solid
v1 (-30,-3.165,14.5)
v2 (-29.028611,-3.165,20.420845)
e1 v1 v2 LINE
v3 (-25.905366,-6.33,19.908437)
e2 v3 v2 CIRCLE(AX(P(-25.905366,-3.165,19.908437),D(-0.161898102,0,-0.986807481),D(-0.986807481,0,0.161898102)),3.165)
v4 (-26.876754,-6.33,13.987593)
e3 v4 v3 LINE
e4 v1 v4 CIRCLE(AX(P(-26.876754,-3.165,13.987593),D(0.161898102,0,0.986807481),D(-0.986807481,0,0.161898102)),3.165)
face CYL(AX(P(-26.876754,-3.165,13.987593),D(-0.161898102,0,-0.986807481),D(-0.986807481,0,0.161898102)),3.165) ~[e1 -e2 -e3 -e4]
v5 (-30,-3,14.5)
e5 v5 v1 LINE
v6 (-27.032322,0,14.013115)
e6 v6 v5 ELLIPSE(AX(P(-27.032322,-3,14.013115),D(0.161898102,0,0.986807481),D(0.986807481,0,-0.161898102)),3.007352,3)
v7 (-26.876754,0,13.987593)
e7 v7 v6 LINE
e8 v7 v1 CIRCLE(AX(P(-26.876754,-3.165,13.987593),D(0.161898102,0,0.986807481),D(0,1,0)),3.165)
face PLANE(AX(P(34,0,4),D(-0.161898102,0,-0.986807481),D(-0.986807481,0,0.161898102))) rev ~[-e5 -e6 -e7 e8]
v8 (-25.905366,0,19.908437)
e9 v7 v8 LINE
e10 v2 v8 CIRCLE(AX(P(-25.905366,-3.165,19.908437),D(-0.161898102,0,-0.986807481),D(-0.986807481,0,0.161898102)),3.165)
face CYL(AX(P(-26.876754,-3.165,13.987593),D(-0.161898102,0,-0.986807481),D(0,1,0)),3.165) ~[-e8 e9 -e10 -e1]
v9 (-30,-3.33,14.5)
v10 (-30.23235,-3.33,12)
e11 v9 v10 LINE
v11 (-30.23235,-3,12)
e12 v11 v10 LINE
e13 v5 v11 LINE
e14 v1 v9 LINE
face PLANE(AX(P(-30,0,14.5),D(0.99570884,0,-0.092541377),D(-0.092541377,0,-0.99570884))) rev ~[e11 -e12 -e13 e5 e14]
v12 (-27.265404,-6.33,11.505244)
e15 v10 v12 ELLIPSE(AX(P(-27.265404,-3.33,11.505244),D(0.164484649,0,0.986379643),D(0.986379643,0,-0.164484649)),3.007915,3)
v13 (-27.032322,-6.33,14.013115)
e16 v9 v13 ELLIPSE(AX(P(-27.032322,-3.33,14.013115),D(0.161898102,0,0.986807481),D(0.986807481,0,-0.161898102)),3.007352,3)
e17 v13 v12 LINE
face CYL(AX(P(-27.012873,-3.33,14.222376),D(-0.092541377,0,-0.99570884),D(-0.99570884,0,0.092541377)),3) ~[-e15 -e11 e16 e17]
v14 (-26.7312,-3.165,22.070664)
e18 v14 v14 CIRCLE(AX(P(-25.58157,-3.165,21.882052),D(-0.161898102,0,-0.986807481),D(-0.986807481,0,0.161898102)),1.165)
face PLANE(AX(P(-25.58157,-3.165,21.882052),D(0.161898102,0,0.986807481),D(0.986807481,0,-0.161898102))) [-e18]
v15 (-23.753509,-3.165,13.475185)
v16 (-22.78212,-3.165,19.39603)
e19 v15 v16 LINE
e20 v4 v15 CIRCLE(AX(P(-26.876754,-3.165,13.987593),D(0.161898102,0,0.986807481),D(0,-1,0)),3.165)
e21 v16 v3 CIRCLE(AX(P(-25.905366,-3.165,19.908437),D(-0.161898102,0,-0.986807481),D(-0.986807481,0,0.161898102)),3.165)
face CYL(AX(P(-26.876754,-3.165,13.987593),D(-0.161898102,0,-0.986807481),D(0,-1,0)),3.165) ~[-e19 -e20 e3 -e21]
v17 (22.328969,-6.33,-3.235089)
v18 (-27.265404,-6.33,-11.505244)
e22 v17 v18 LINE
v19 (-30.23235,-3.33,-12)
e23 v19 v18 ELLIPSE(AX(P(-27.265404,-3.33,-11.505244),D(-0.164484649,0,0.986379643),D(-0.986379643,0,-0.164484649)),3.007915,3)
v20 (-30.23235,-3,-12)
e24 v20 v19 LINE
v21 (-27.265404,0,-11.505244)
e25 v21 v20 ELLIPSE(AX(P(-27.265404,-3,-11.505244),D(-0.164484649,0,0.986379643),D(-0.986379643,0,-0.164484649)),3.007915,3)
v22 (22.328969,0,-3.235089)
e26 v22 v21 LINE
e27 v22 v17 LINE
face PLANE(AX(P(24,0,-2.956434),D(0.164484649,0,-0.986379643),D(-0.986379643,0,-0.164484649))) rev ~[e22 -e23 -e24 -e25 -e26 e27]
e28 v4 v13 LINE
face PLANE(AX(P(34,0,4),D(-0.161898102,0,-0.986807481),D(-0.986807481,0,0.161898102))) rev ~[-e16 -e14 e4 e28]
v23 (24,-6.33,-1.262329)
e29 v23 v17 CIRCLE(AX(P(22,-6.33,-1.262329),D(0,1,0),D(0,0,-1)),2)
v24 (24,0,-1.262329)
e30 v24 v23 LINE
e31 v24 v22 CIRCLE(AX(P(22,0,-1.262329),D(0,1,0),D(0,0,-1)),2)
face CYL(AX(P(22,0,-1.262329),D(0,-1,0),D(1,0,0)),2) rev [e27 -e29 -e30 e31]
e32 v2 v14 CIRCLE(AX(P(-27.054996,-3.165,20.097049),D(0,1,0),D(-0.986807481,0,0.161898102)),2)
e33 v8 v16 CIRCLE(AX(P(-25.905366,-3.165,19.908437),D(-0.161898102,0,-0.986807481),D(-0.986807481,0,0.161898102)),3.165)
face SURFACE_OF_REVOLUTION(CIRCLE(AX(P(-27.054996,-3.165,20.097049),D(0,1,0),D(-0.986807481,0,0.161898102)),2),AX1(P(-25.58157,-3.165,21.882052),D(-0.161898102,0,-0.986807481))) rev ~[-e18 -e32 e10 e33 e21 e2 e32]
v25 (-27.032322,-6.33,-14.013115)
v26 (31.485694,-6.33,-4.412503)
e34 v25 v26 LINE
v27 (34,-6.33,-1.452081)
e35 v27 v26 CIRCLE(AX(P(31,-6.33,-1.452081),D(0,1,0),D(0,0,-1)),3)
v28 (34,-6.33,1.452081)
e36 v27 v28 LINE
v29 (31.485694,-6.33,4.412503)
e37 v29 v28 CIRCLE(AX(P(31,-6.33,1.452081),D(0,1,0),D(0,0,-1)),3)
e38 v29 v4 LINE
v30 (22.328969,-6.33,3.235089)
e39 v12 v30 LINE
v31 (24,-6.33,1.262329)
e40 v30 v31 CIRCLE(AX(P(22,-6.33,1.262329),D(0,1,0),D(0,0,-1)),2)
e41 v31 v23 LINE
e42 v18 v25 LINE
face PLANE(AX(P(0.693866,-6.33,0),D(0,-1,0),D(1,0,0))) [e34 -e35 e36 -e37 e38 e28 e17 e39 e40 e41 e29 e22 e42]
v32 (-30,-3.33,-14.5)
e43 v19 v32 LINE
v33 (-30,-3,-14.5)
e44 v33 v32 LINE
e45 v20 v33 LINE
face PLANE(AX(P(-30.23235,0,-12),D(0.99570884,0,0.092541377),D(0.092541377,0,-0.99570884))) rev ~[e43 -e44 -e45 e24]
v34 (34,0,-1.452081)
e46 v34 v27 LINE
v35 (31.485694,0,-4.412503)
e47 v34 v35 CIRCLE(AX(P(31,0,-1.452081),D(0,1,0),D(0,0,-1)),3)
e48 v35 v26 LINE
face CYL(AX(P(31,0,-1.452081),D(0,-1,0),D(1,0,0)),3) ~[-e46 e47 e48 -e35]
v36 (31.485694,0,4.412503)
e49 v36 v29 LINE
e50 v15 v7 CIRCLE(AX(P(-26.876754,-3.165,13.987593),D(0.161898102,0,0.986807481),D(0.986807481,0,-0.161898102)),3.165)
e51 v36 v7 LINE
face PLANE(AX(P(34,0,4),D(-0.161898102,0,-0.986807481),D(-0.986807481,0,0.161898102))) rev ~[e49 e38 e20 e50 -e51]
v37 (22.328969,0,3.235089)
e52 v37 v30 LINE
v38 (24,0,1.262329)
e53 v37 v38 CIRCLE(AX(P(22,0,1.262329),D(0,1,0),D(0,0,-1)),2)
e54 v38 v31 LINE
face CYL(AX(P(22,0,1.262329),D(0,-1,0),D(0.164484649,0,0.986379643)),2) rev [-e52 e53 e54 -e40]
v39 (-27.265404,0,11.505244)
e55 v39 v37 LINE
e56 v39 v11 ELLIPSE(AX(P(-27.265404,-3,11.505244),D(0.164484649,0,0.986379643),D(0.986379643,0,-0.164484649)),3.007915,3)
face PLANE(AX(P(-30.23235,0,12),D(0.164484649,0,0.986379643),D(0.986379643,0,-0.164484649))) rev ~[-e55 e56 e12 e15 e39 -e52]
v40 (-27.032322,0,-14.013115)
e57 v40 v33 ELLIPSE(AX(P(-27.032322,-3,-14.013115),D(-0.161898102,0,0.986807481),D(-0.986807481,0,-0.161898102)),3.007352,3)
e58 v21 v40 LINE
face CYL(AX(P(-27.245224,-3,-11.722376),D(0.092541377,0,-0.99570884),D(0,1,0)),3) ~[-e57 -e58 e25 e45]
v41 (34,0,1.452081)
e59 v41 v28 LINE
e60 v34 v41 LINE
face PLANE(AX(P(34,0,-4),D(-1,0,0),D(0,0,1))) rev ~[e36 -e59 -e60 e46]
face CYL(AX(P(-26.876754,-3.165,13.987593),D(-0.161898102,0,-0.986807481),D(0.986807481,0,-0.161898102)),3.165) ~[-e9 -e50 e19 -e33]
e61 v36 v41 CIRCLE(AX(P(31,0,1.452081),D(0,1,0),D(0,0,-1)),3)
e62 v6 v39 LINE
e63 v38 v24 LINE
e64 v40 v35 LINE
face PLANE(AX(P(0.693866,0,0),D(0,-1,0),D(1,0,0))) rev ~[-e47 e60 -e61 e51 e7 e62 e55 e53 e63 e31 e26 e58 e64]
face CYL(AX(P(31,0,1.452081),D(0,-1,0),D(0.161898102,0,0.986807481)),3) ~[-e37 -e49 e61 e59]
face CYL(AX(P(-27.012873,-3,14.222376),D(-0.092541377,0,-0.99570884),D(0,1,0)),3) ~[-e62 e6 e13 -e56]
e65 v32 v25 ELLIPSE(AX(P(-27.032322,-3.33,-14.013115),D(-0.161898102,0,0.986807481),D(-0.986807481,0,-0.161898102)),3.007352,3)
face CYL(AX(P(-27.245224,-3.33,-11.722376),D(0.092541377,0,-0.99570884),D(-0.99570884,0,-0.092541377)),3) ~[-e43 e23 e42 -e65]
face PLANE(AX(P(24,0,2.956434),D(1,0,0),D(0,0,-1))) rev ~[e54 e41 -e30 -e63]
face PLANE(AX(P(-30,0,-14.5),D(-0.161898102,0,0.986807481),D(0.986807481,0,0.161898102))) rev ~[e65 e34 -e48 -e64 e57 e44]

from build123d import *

# Parameters (mm, degrees)
F1_DEPTH = 6.33
F2_R     = 2
F3_R     = 3
F5_DEPTH = 8
F7_R     = 3


# Not quite as in the source:
# - a fillet or chamfer that OpenCascade refuses, or shapes differently, is made with other operations: its cross-section is extruded or revolved along the edge and cut away or added


with BuildPart() as f1:
    # F0 (on Front) → F1 (new body)
    with BuildSketch(Plane.XZ):
        Polygon((34, 4), (-30, 14.5), (-30.2323504967, 12), (24, 2.9564342819), (24, -2.9564342819), (-30.2323504967, -12), (-30, -14.5), (34, -4), align=None)
    extrude(amount=F1_DEPTH)

    # F2
    f2_edges = [f1.edges().sort_by_distance(p)[0] for p in [
        (24, -3.165, -2.956434),
        (24, -3.165, 2.956434),
    ]]
    fillet(f2_edges, radius=F2_R)

    # F3
    f3_edges = [f1.edges().sort_by_distance(p)[0] for p in [
        (34, -3.165, 4),
        (34, -3.165, -4),
    ]]
    fillet(f3_edges, radius=F3_R)

    # F4 (on face) → F5 (join)
    with BuildSketch(Plane(origin=(1.5302228826, 0, 9.3270728083), x_dir=(0.9868074809, 0, -0.1618981023), z_dir=(0.1618981023, 0, 0.9868074809))):
        with BuildLine():
            ThreePointArc((-28.7867469125, -6.33), (-26.54875395, -5.4029929625), (-25.6217469125, -3.165))
            ThreePointArc((-25.6217469125, -3.165), (-26.54875395, -0.9270070375), (-28.7867469125, 0))
            ThreePointArc((-28.7867469125, 0), (-31.0247398749, -0.9270070375), (-31.9517469125, -3.165))
            ThreePointArc((-31.9517469125, -3.165), (-31.0247398749, -5.4029929625), (-28.7867469125, -6.33))
        make_face()
    extrude(amount=F5_DEPTH)

    # F6: fillet of radius 2 on 1 edges, made by hand

    # F6_s1 → F6_t2 (revolve, cut)
    with BuildSketch(Plane.XZ.offset(3.165)):
        with BuildLine():
            ThreePointArc((-29.0286113859, 20.4208448857), (-28.221594455, 21.7215636961), (-26.7312002194, 22.0706636429))
            Line((-26.7312002194, 22.0706636429), (-28.7048151813, 22.3944598476))
            Line((-28.7048151813, 22.3944598476), (-29.0286113859, 20.4208448857))
        make_face()
    revolve(axis=Axis((-25.581569504, -3.165, 21.8820523537), (-0.1618981023, 0, -0.9868074809)), mode=Mode.SUBTRACT)

    # F7
    f7_edges = [f1.edges().sort_by_distance(p)[0] for p in [
        (-30.116175, 0, 13.25),
        (-30.116175, -6.33, 13.25),
        (-30.116175, 0, -13.25),
        (-30.116175, -6.33, -13.25),
    ]]
    fillet(f7_edges, radius=F7_R)


solid = f1.part
